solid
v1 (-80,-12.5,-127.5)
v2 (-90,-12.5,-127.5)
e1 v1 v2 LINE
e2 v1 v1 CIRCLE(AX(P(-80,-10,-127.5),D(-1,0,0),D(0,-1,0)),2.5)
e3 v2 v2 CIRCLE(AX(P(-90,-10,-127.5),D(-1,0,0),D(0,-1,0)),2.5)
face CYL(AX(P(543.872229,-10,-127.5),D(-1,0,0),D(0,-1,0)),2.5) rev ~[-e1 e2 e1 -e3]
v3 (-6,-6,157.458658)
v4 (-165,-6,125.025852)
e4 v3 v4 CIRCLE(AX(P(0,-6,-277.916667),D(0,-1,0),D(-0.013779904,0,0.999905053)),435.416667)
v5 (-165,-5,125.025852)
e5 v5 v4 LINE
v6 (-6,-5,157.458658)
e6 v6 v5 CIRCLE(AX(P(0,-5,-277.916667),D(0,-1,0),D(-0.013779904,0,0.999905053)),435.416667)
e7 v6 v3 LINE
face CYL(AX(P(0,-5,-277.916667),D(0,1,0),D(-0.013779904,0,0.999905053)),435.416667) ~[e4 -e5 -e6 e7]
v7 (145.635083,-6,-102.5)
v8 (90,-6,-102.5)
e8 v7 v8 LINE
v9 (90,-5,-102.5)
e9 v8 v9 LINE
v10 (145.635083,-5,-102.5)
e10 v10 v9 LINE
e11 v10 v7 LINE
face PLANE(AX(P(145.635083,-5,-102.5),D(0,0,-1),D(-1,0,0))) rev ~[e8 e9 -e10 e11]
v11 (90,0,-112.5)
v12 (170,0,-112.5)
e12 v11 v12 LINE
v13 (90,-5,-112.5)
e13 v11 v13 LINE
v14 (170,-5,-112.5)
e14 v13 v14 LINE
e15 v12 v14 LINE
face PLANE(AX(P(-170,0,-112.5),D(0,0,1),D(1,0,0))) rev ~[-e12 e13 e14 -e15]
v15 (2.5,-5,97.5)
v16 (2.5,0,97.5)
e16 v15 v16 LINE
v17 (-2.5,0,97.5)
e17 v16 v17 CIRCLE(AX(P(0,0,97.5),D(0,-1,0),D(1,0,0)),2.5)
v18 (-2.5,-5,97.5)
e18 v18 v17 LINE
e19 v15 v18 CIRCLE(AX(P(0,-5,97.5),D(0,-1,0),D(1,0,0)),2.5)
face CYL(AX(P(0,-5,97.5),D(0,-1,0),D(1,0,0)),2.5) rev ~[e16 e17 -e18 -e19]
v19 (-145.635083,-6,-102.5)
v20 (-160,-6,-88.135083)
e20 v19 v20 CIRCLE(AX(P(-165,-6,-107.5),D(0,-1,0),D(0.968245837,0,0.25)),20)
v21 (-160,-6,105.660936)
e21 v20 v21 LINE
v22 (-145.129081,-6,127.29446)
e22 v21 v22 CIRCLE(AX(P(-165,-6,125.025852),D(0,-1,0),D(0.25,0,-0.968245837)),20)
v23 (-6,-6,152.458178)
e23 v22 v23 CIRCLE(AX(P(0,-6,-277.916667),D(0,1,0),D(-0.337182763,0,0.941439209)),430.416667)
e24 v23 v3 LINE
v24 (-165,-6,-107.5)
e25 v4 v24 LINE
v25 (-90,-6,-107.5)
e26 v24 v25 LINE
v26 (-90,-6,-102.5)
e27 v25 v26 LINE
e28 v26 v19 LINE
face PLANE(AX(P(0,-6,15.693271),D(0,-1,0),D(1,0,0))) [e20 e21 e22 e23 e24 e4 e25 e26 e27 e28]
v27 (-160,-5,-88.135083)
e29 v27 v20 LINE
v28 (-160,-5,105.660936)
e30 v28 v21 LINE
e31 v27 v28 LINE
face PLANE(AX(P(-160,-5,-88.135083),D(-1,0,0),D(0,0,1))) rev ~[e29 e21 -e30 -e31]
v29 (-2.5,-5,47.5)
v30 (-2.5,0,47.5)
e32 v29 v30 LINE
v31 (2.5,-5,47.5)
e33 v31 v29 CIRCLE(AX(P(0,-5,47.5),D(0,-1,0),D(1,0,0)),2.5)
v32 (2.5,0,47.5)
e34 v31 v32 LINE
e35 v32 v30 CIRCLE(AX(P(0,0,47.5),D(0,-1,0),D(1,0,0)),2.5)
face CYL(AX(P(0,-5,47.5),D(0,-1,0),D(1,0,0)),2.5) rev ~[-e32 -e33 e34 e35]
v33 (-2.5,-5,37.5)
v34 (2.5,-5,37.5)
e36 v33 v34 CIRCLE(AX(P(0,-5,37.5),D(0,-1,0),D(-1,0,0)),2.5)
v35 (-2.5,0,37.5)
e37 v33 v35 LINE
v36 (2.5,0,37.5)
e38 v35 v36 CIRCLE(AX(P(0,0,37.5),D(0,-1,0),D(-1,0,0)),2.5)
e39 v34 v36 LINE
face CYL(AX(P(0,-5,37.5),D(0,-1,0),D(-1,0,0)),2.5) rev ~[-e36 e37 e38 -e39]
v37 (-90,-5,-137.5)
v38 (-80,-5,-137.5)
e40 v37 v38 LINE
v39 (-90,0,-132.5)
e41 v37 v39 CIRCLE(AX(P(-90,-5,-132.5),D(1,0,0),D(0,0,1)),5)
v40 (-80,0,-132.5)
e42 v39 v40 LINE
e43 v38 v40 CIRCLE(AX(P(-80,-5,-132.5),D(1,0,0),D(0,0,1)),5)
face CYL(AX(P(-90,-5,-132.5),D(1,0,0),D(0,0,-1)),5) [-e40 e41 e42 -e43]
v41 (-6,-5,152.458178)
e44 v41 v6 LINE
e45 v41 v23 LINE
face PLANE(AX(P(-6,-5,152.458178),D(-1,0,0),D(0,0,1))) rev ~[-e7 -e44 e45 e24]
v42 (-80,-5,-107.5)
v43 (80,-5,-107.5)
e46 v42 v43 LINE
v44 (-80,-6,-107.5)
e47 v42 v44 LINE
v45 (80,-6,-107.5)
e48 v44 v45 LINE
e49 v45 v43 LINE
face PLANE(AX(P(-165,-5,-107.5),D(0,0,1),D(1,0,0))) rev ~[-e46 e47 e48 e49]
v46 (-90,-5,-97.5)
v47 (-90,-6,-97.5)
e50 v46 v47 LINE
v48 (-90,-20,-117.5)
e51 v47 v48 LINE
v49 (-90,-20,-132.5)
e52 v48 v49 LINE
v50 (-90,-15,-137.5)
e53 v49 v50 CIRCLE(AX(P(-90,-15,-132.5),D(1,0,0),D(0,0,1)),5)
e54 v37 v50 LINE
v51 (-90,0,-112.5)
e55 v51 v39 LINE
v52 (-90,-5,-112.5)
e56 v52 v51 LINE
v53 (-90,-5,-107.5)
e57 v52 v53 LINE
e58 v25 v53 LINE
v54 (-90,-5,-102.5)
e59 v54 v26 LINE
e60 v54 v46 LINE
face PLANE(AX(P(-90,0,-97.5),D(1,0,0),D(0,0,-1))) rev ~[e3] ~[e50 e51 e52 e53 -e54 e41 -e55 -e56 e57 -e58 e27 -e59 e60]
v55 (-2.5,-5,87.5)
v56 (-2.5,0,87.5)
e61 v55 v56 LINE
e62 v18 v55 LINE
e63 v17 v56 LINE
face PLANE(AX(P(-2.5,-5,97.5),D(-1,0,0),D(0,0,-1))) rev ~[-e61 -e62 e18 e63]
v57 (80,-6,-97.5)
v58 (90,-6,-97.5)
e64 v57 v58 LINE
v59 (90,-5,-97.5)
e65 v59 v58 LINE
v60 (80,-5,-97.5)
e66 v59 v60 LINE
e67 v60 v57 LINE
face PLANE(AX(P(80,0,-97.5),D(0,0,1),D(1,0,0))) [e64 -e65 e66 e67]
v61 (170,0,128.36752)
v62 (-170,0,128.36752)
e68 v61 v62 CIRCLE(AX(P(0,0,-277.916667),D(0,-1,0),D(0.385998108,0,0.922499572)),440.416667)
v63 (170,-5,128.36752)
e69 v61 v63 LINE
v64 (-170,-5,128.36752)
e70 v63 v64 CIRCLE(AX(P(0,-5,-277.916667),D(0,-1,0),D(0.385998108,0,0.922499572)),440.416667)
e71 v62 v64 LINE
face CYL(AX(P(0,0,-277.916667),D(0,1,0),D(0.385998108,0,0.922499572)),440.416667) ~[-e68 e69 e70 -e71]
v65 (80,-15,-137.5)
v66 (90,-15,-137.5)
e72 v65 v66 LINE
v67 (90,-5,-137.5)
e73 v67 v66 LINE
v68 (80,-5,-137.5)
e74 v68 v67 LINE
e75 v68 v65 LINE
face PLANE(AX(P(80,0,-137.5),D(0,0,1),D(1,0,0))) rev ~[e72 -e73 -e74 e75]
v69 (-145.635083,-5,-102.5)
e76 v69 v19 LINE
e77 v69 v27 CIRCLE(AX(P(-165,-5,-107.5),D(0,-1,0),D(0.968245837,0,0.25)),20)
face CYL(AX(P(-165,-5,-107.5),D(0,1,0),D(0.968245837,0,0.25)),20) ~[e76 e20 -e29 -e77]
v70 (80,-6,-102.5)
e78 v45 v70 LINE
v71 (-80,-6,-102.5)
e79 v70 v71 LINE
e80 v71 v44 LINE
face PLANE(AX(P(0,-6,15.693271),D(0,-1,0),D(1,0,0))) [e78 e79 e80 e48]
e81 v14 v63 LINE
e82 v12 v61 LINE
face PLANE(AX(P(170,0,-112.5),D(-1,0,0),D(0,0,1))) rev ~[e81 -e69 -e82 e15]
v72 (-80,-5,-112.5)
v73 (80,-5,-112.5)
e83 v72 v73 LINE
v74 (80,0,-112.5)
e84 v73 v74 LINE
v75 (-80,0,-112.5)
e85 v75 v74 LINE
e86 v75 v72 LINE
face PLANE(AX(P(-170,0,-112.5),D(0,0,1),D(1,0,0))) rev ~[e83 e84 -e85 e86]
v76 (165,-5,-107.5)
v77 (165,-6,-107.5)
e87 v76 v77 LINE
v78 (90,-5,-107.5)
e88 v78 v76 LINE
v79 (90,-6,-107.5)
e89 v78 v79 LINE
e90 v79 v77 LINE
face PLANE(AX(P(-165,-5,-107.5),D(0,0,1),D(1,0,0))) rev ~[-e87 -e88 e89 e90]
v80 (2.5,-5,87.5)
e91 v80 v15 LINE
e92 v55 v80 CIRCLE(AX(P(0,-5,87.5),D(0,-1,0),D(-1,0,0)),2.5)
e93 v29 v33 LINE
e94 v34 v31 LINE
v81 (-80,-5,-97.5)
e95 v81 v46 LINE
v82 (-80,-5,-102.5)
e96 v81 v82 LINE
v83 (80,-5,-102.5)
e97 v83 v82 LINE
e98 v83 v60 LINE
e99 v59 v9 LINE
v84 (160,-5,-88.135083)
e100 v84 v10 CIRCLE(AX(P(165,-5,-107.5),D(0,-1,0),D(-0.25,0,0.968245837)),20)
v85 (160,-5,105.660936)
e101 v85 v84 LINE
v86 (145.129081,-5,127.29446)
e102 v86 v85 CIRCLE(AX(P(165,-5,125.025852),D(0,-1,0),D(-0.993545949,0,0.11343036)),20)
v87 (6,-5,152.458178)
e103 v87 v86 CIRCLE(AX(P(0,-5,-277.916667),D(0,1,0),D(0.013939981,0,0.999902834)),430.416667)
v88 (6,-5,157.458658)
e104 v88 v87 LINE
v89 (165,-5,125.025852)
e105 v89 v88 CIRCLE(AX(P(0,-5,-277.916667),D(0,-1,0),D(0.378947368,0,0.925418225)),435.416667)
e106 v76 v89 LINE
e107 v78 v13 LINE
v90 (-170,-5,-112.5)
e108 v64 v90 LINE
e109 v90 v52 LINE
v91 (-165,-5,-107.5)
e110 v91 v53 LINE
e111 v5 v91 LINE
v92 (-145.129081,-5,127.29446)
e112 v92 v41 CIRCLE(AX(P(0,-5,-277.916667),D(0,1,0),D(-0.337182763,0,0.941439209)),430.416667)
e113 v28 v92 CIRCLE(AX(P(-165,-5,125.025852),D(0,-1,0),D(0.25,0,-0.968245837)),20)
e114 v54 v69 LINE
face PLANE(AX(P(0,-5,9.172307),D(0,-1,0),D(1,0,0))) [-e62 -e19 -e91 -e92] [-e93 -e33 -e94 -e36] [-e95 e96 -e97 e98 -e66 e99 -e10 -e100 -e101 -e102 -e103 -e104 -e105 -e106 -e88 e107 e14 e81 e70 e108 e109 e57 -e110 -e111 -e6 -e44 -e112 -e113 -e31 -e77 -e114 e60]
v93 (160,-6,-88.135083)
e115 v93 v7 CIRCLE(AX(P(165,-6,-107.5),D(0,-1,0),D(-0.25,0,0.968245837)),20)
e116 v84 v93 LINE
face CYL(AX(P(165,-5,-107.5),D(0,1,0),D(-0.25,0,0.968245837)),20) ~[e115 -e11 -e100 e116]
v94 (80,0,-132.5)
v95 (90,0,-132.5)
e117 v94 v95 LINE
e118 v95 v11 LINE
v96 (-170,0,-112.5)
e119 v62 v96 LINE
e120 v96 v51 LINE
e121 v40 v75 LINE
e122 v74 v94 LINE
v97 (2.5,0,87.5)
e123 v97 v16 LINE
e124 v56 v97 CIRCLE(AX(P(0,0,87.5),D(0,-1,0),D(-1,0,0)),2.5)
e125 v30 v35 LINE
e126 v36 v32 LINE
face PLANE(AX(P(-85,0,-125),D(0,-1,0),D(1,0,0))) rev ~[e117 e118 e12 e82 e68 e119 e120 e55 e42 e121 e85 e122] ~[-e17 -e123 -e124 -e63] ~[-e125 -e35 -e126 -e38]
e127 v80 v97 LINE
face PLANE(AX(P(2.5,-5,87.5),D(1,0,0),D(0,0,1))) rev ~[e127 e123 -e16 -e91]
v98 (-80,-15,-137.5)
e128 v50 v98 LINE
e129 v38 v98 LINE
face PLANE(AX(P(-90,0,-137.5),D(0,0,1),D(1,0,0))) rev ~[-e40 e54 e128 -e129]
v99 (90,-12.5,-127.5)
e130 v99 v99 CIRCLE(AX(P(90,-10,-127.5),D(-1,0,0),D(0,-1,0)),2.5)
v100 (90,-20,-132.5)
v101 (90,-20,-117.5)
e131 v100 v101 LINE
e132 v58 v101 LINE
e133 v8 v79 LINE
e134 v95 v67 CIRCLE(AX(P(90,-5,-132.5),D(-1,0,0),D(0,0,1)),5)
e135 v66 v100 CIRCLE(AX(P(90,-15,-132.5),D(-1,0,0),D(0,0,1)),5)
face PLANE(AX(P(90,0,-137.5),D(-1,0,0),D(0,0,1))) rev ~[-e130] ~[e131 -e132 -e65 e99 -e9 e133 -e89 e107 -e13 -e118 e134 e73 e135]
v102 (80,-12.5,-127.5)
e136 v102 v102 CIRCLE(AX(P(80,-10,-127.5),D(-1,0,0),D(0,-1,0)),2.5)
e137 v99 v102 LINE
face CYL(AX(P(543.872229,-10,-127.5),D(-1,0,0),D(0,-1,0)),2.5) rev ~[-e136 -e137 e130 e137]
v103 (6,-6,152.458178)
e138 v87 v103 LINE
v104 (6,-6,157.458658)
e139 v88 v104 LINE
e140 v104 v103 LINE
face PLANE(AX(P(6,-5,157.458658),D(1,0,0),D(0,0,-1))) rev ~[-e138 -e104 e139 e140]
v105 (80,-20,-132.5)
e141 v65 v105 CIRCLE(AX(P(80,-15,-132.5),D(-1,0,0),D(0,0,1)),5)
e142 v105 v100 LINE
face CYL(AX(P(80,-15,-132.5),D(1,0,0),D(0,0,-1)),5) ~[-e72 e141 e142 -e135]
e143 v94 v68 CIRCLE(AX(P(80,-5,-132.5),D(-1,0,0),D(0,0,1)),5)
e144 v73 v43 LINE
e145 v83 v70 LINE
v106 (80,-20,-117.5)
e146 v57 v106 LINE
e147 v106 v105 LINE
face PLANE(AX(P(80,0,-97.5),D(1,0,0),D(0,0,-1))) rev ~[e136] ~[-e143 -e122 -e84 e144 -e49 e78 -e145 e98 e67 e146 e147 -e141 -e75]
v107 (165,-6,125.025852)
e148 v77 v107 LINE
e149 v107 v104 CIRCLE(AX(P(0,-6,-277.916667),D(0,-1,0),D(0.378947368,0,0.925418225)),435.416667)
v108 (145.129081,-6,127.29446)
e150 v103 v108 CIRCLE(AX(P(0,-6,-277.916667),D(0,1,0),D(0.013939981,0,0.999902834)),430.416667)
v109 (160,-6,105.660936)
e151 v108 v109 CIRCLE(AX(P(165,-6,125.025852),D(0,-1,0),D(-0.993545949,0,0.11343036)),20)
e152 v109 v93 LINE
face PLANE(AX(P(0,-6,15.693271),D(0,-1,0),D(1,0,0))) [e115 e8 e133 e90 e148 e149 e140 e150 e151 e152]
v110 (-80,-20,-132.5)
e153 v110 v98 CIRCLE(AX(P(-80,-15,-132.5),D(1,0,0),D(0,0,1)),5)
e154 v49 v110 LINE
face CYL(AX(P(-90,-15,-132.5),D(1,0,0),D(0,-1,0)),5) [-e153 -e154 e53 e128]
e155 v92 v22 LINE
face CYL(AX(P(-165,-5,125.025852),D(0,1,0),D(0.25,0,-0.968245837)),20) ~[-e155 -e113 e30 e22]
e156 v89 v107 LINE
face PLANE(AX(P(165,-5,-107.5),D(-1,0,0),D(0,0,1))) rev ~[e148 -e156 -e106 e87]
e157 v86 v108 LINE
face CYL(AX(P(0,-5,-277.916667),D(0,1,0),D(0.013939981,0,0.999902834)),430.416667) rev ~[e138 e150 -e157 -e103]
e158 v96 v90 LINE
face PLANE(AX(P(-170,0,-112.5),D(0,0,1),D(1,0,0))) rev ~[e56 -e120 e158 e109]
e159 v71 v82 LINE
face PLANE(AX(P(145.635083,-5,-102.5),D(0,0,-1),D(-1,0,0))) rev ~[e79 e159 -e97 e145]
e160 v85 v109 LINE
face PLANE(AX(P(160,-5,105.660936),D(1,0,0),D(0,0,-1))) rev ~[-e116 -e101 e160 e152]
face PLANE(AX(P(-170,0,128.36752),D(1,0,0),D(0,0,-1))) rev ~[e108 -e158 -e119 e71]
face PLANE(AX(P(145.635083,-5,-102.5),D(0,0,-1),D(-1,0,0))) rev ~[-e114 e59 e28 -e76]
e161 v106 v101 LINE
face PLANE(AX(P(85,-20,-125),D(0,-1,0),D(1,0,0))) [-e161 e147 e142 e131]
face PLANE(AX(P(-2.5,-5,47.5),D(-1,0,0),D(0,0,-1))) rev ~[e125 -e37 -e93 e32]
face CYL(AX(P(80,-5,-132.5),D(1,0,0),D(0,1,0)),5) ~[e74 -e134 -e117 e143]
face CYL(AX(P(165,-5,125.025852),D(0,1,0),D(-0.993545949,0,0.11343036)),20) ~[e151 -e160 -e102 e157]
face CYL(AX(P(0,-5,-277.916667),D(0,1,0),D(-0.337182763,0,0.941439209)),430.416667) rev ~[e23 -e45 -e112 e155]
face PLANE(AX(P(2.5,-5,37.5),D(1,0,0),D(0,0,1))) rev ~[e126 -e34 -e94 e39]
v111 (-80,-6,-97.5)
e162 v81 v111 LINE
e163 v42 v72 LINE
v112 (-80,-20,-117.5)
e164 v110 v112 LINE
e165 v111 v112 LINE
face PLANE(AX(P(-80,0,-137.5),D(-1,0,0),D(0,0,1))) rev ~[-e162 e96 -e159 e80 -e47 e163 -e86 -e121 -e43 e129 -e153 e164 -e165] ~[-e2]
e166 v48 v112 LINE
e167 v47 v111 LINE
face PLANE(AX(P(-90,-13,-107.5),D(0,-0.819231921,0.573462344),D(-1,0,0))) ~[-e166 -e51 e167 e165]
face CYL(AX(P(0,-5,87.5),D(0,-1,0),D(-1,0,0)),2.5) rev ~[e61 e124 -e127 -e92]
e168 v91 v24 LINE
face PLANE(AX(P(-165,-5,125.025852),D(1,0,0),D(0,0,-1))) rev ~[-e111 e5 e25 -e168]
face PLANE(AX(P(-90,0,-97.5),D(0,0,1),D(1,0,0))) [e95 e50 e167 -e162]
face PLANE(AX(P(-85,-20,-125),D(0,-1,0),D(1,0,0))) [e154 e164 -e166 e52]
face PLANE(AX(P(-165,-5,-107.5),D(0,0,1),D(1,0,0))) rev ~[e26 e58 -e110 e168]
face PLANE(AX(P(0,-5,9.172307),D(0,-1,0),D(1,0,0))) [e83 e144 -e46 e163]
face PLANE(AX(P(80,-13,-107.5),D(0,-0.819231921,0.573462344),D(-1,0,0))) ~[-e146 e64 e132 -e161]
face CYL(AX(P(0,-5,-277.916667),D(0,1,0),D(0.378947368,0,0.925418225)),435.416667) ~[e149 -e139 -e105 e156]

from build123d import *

# Parameters (mm, degrees)
F0_W       = 10
F0_H       = 15
F1_DEPTH   = 5
F3_DEPTH   = 1
F0_H_2     = 25
F4_DEPTH   = 20
F5_SIZE2   = 20
F5_SIZE    = 14
F5_2_SIZE2 = 20
F5_2_SIZE  = 14
F6_R       = 5
F8_D       = 5
F10_DEPTH  = 5


# Not quite as in the source:
# - a feature names something its author has since deleted; it is built from what else it names


with BuildPart() as f1:
    # F0 (on Front) → F1 (new body)
    with BuildSketch(Plane.XZ):
        with BuildLine():
            ThreePointArc((170, 128.3675199291), (0, 162.5), (-170, 128.3675199291))
            Line((-170, 128.3675199291), (-170, -112.5))
            Line((-170, -112.5), (-90, -112.5))
            Line((-90, -112.5), (-90, -97.5))
            Line((-90, -97.5), (-80, -97.5))
            Line((-80, -97.5), (-80, -112.5))
            Line((-80, -112.5), (80, -112.5))
            Line((80, -112.5), (80, -97.5))
            Line((80, -97.5), (90, -97.5))
            Line((90, -97.5), (90, -112.5))
            Line((90, -112.5), (170, -112.5))
            Line((170, -112.5), (170, 128.3675199291))
        make_face()
        with Locations((-85, -105)):
            Rectangle(F0_W, F0_H)
        with Locations((85, -105)):
            Rectangle(F0_W, F0_H)
    extrude(amount=F1_DEPTH)

    # F2 (on face) → F3 (join)
    with BuildSketch(Plane.XZ.offset(5)):
        with BuildLine():
            ThreePointArc((-6, 157.4586583244), (-87.0242594123, 148.7148510214), (-165, 125.0258523247))
            Line((-165, 125.0258523247), (-165, -107.5))
            Line((-165, -107.5), (165, -107.5))
            Line((165, -107.5), (165, 125.0258523247))
            ThreePointArc((165, 125.0258523247), (87.0242594123, 148.7148510214), (6, 157.4586583244))
            Line((6, 157.4586583244), (6, 152.4581780262))
            ThreePointArc((6, 152.4581780262), (76.6048494822, 145.628140857), (145.1290810133, 127.294459524))
            ThreePointArc((145.1290810133, 127.294459524), (148.5184044395, 113.696377148), (160, 105.6609355937))
            Line((160, 105.6609355937), (160, -88.135083269))
            ThreePointArc((160, -88.135083269), (150.8578643763, -93.3578643763), (145.635083269, -102.5))
            Line((145.635083269, -102.5), (-145.635083269, -102.5))
            ThreePointArc((-145.635083269, -102.5), (-150.8578643763, -93.3578643763), (-160, -88.135083269))
            Line((-160, -88.135083269), (-160, 105.6609355937))
            ThreePointArc((-160, 105.6609355937), (-148.5184044395, 113.696377148), (-145.1290810133, 127.294459524))
            ThreePointArc((-145.1290810133, 127.294459524), (-76.6048494822, 145.628140857), (-6, 152.4581780262))
            Line((-6, 152.4581780262), (-6, 157.4586583244))
        make_face()
    extrude(amount=F3_DEPTH)

    # F0 (on Front) → F4 (join)
    with BuildSketch(Plane.XZ):
        with Locations((-85, -125)):
            Rectangle(F0_W, F0_H_2)
        with Locations((85, -125)):
            Rectangle(F0_W, F0_H_2)
        with Locations((85, -105)):
            Rectangle(F0_W, F0_H)
        with Locations((-85, -105)):
            Rectangle(F0_W, F0_H)
    extrude(amount=F4_DEPTH)

    # F5
    f5_edges = [f1.edges().sort_by_distance(p)[0] for p in [
        (85, -20, -97.5),
    ]]
    f5_side = f1.faces().sort_by_distance((85, -12.5, -97.5))[0]
    chamfer(f5_edges, length=F5_SIZE, length2=F5_SIZE2, reference=f5_side)

    # F5#2
    f5_2_edges = [f1.edges().sort_by_distance(p)[0] for p in [
        (-85, -20, -97.5),
    ]]
    f5_2_side = f1.faces().sort_by_distance((-85, -12.5, -97.5))[0]
    chamfer(f5_2_edges, length=F5_2_SIZE, length2=F5_2_SIZE2, reference=f5_2_side)

    # F6
    f6_edges = [f1.edges().sort_by_distance(p)[0] for p in [
        (-85, -20, -137.5),
        (85, -20, -137.5),
        (-85, 0, -137.5),
        (85, 0, -137.5),
    ]]
    fillet(f6_edges, radius=F6_R)

    # F8 (through all)
    with Locations(Plane.YZ.offset(90)):
        with Locations((-10, -127.5)):
            Hole(F8_D / 2)

    # F9 (on face) → F10 (cut)
    with BuildSketch(Plane.XZ.offset(5)):
        with BuildLine():
            Line((2.5, 87.5), (2.5, 97.5))
            ThreePointArc((2.5, 97.5), (0, 100), (-2.5, 97.5))
            Line((-2.5, 97.5), (-2.5, 87.5))
            ThreePointArc((-2.5, 87.5), (0, 85), (2.5, 87.5))
        make_face()
        with BuildLine():
            Line((2.5, 37.5), (2.5, 47.5))
            ThreePointArc((2.5, 47.5), (0, 50), (-2.5, 47.5))
            Line((-2.5, 47.5), (-2.5, 37.5))
            ThreePointArc((-2.5, 37.5), (0, 35), (2.5, 37.5))
        make_face()
    extrude(amount=-F10_DEPTH, mode=Mode.SUBTRACT)


solid = f1.part
